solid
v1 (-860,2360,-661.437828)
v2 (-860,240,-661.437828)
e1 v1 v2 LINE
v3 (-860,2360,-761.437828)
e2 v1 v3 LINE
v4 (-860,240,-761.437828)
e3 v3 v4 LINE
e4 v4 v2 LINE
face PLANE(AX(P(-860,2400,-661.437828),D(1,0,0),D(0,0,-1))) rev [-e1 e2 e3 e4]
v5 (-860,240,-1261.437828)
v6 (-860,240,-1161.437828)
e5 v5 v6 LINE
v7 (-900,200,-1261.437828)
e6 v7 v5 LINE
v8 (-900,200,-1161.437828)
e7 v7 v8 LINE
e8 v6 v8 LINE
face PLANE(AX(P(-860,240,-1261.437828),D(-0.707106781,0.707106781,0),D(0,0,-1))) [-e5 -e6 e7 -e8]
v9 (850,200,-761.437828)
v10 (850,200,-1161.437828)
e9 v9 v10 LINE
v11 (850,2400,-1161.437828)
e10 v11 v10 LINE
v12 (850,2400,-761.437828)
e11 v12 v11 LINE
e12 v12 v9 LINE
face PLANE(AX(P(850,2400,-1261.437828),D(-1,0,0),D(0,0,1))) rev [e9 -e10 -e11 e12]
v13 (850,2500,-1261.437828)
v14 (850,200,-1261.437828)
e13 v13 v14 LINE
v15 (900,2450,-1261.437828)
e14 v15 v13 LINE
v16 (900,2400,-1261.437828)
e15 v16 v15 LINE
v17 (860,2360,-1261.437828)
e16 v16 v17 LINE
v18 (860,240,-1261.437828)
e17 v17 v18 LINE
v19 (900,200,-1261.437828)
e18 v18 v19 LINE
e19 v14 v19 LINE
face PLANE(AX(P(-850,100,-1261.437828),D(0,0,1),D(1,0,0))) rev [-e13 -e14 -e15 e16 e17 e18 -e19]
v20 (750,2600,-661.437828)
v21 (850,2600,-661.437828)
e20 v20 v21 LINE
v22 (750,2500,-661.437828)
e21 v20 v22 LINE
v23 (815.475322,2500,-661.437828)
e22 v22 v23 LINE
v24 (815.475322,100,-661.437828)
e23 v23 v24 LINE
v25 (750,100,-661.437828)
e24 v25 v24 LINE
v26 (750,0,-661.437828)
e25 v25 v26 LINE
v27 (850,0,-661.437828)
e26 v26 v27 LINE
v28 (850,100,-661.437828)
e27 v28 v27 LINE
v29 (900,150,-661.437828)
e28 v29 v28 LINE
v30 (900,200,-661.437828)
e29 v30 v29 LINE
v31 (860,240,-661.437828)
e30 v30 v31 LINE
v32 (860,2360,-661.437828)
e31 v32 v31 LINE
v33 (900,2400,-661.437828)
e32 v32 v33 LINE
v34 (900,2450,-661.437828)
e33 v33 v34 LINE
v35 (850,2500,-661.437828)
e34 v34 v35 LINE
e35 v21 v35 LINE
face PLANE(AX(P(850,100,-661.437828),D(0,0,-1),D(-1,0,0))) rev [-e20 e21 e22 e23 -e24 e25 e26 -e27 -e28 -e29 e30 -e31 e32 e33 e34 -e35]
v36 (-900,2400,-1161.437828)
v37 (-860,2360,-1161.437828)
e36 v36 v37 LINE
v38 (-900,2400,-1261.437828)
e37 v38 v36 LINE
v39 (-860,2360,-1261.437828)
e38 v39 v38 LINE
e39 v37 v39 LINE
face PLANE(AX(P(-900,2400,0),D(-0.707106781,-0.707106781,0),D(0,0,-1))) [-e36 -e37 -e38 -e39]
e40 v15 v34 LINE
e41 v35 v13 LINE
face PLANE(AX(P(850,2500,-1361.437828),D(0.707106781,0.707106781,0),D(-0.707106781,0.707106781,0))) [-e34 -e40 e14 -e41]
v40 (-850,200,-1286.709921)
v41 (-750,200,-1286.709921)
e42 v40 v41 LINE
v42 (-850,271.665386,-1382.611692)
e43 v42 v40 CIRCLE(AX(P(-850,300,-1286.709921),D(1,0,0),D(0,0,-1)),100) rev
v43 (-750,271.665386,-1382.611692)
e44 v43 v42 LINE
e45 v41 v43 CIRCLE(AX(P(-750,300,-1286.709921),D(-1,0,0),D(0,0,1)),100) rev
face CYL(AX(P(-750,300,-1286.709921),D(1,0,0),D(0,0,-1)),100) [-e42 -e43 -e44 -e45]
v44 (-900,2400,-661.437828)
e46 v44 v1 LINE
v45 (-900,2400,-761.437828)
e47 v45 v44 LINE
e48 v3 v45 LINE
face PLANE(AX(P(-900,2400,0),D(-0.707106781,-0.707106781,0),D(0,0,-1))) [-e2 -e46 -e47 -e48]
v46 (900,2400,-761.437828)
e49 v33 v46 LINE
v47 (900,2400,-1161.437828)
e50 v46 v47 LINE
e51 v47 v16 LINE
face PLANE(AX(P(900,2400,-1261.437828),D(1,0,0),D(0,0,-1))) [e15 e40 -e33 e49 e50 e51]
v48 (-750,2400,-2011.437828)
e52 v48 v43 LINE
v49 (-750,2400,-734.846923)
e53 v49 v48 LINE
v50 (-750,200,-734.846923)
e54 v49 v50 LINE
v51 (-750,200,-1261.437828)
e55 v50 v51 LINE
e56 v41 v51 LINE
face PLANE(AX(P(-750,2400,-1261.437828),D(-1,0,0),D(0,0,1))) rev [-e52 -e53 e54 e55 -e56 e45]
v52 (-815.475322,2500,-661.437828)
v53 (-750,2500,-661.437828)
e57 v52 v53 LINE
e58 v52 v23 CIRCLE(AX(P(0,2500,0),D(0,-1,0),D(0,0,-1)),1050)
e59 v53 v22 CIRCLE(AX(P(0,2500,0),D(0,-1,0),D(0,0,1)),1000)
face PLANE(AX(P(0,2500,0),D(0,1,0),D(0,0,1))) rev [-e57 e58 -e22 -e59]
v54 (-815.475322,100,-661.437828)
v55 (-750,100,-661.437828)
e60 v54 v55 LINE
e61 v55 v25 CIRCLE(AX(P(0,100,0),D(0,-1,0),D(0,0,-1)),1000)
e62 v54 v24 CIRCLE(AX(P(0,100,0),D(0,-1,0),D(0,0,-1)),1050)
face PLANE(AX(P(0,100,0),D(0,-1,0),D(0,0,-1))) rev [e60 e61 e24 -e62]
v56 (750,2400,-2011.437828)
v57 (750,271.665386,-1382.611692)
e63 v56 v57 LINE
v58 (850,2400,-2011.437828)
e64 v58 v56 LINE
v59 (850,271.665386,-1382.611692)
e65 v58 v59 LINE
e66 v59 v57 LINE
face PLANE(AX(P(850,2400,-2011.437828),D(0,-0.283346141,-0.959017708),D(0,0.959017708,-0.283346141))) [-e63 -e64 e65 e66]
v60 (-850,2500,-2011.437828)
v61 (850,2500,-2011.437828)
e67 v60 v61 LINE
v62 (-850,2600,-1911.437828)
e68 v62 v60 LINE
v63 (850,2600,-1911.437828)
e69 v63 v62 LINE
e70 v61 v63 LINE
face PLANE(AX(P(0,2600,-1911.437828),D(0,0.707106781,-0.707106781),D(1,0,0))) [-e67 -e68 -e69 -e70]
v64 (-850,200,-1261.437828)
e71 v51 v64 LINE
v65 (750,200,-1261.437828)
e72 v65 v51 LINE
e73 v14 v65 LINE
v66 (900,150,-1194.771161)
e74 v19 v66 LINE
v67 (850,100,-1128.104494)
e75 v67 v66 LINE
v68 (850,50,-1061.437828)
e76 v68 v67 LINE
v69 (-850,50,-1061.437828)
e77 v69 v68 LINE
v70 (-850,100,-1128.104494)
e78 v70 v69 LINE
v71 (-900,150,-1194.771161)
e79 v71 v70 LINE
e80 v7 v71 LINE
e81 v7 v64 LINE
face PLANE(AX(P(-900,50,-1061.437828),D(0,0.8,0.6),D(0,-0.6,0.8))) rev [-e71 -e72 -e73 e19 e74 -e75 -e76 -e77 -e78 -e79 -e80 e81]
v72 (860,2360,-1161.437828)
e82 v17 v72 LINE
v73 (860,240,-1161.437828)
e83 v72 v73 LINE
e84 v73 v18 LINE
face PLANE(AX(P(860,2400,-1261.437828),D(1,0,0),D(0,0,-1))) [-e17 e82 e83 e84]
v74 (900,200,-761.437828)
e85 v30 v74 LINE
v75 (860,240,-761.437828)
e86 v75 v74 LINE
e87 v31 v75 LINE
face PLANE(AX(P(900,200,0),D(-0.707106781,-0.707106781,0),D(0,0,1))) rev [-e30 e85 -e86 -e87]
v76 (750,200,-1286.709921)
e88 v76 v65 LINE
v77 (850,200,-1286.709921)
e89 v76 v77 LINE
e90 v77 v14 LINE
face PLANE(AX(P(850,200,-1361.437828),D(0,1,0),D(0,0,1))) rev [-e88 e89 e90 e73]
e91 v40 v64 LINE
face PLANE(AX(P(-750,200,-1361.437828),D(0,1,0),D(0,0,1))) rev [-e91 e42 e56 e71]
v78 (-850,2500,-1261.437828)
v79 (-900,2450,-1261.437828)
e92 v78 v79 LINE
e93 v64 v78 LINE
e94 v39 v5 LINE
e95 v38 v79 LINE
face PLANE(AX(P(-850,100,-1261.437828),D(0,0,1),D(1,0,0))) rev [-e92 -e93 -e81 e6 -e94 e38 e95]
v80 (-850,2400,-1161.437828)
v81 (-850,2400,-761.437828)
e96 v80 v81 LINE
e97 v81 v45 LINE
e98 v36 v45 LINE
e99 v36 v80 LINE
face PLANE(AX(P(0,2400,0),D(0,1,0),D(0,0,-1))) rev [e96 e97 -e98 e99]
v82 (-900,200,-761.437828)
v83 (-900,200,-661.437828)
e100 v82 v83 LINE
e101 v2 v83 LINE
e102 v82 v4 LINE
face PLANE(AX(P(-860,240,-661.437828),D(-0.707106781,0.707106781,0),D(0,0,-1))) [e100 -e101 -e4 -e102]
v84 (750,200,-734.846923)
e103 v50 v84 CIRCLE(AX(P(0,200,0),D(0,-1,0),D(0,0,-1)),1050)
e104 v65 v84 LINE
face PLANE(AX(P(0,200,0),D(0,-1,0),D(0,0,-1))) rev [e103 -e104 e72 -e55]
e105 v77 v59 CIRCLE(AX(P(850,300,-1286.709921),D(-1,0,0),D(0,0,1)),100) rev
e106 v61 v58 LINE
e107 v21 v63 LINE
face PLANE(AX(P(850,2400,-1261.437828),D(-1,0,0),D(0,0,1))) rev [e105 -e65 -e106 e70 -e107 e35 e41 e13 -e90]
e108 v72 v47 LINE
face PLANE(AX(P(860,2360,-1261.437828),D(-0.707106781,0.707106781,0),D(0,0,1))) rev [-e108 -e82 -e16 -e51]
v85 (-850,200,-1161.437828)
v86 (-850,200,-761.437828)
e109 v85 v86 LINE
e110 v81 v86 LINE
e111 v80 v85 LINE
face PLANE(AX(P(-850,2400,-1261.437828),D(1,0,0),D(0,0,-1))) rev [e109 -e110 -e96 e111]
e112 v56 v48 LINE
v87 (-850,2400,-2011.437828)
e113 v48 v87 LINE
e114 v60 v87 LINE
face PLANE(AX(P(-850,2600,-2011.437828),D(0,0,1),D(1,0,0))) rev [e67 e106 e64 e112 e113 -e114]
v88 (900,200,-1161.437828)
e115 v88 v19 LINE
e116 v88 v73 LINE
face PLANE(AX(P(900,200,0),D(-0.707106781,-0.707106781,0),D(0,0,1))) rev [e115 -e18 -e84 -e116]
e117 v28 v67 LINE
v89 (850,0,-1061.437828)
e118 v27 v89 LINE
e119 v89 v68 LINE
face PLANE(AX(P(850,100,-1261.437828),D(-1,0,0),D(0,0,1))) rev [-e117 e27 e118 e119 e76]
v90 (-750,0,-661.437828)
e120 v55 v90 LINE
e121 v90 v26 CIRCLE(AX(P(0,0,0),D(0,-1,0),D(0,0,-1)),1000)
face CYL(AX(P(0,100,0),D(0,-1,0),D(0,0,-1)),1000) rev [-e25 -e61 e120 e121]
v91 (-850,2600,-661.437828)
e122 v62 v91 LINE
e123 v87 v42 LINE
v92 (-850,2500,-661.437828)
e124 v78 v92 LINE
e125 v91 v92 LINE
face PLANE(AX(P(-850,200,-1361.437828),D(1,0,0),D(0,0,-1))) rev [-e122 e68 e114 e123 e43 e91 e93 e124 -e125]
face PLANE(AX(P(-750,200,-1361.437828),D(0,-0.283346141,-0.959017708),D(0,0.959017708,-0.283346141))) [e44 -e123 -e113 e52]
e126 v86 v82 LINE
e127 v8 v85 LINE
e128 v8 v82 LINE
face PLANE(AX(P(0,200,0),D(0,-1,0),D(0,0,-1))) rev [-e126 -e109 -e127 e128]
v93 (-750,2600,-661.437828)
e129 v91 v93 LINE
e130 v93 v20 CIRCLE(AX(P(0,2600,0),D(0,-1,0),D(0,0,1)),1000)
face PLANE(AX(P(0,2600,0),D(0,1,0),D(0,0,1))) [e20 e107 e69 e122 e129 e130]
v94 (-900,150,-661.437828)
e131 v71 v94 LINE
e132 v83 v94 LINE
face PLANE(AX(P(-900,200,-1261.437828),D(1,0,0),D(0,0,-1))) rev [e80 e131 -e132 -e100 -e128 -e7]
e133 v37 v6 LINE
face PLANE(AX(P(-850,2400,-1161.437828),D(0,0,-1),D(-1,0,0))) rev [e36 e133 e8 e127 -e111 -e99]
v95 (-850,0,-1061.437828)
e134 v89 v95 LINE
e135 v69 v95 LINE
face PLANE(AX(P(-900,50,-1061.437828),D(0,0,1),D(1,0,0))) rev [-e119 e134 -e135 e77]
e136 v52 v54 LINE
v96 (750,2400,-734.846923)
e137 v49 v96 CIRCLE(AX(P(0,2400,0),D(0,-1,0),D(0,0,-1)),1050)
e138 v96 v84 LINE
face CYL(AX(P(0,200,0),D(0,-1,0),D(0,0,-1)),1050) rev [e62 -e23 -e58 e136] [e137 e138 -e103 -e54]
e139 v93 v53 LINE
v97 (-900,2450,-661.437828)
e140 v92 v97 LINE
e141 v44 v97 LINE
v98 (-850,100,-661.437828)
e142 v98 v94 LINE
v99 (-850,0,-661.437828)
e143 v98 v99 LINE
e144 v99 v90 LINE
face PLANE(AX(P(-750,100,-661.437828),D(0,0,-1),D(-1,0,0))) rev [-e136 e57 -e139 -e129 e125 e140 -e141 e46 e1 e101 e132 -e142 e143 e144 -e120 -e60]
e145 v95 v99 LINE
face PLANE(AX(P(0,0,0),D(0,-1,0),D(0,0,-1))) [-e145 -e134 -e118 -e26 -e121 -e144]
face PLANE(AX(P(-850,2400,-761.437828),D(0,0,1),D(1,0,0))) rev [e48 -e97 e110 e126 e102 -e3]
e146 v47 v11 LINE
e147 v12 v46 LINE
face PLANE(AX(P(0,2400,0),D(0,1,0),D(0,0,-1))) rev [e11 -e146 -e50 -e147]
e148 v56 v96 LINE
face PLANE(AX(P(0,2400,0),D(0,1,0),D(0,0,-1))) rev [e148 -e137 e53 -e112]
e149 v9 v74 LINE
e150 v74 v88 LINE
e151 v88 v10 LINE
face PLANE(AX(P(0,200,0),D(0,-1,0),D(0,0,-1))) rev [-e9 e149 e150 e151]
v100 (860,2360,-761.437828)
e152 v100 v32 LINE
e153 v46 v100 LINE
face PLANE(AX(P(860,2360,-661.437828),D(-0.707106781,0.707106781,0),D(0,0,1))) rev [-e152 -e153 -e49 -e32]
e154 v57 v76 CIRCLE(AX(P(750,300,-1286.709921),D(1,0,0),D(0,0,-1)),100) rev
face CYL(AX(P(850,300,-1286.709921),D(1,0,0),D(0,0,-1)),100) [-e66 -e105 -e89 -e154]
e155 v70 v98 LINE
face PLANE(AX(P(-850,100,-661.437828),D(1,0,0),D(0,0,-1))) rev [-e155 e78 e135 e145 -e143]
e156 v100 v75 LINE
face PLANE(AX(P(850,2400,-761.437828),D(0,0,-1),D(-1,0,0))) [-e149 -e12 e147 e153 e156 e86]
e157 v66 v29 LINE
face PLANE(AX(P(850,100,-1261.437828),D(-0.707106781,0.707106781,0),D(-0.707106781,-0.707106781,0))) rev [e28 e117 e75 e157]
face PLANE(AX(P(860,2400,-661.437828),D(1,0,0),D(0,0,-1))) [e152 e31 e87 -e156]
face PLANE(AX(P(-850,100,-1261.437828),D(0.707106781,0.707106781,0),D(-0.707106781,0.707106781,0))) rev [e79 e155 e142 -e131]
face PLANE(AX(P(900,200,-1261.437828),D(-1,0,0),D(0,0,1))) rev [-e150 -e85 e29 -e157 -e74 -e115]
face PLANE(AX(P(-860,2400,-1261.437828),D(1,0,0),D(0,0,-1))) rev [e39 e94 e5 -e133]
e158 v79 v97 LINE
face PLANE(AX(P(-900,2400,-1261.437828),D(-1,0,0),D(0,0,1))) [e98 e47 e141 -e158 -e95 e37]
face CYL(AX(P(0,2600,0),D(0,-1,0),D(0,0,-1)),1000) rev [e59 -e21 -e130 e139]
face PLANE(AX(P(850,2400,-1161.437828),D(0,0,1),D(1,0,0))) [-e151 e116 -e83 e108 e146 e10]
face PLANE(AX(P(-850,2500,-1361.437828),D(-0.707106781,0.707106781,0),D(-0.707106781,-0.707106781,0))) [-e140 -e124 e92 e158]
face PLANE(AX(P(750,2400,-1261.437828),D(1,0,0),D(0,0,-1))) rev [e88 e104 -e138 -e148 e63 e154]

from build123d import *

# Parameters (mm, degrees)
BOSS_EXTRUDE1_DEPTH  = 100
BOSS_EXTRUDE2_DEPTH  = 100
CUT_EXTRUDE1_DEPTH   = 1101
BOSS_EXTRUDE3_DEPTH  = 2200
SKETCH6_W            = 10
SKETCH6_H            = 100
BOSS_EXTRUDE4_DEPTH  = 2200
SKETCH7_W            = 100
SKETCH7_H            = 2200
BOSS_EXTRUDE6_DEPTH  = 100
CHAMFER2_SIZE        = 40
MIRROR2_START        = -1261.437827766
MIRROR2_DEPTH        = 211.43967231
MIRROR2_START_2      = -1049.998155456
MIRROR2_2_DEPTH      = 388.56032769
MIRROR2_START_3      = 2400
MIRROR2_3_DEPTH      = 100
CHAMFER3_SIZE        = 40
BOSS_EXTRUDE7_DEPTH  = 100
BOSS_EXTRUDE8_DEPTH  = 100
FILLET2_R            = 100
BOSS_EXTRUDE9_DEPTH  = 100
SKETCH13_W           = 1700
SKETCH13_H           = 750
BOSS_EXTRUDE12_DEPTH = 200
CHAMFER5_SIZE        = 100
CUT_EXTRUDE2_DEPTH   = 3748.78362969


with BuildPart() as part:
    # Sketch1 → Boss-Extrude1 (new body)
    with BuildSketch(Plane(origin=(0, 0, 0), x_dir=(1, 0, 0), z_dir=(0, 1, 0))):
        with BuildLine():
            Line((-750, 661.437827766), (-850, 661.437827766))
            Line((-850, 661.437827766), (-850, 1261.437827766))
            Line((-850, 1261.437827766), (850, 1261.437827766))
            Line((850, 1261.437827766), (850, 661.437827766))
            Line((850, 661.437827766), (750, 661.437827766))
            ThreePointArc((750, 661.437827766), (0, 1000), (-750, 661.437827766))
        make_face()
    extrude(amount=BOSS_EXTRUDE1_DEPTH)

    # Sketch2 → Boss-Extrude2 (add)
    with BuildSketch(Plane(origin=(0, 100, 0), x_dir=(1, 0, 0), z_dir=(0, 1, 0))):
        with BuildLine():
            Line((850, 1261.437827766), (900, 1261.437827766))
            Line((900, 1261.437827766), (900, 661.437827766))
            Line((900, 661.437827766), (815.475321515, 661.437827766))
            ThreePointArc((815.475321515, 661.437827766), (0, 1050), (-815.475321515, 661.437827766))
            Line((-815.475321515, 661.437827766), (-850, 661.437827766))
            Line((-850, 661.437827766), (-900, 661.437827766))
            Line((-900, 661.437827766), (-900, 1261.437827766))
            Line((-900, 1261.437827766), (-850, 1261.437827766))
            Line((-850, 1261.437827766), (850, 1261.437827766))
        make_face()
    extrude(amount=BOSS_EXTRUDE2_DEPTH)

    # Sketch4 → Cut-Extrude1 (cut, through all)
    with BuildSketch(Plane.XY.offset(-661.437827766)):
        Polygon((-850, 100), (-900, 150), (-900, 100), align=None)
        Polygon((850, 100), (900, 150), (900, 100), align=None)
    extrude(amount=-CUT_EXTRUDE1_DEPTH, mode=Mode.SUBTRACT)

    # Sketch5 → Boss-Extrude3 (add)
    with BuildSketch(Plane(origin=(0, 200, 0), x_dir=(1, 0, 0), z_dir=(0, 1, 0))):
        with BuildLine():
            Line((-750, 1261.437827766), (-750, 734.846922835))
            ThreePointArc((-750, 734.846922835), (-783.597772698, 698.90952964), (-815.475321515, 661.437827766))
            Line((-815.475321515, 661.437827766), (-850, 661.437827766))
            Line((-850, 661.437827766), (-850, 1261.437827766))
            Line((-850, 1261.437827766), (-750, 1261.437827766))
        make_face()
        with BuildLine():
            Line((850, 661.437827766), (815.475321515, 661.437827766))
            ThreePointArc((815.475321515, 661.437827766), (783.597772698, 698.90952964), (750, 734.846922835))
            Line((750, 734.846922835), (750, 1261.437827766))
            Line((750, 1261.437827766), (850, 1261.437827766))
            Line((850, 1261.437827766), (850, 661.437827766))
        make_face()
    extrude(amount=BOSS_EXTRUDE3_DEPTH)

    # Sketch6 → Boss-Extrude4 (add)
    with BuildSketch(Plane(origin=(0, 200, 0), x_dir=(1, 0, 0), z_dir=(0, 1, 0))):
        with Locations((-855, 1211.437827766)):
            Rectangle(SKETCH6_W, SKETCH6_H)
        with Locations((-855, 711.437827766)):
            Rectangle(SKETCH6_W, SKETCH6_H)
    boss_extrude4 = extrude(amount=BOSS_EXTRUDE4_DEPTH)

    # Sketch7 → Boss-Extrude6 (add)
    with BuildSketch(Plane(origin=(0, 0, -1261.437827766), x_dir=(-1, 0, 0), z_dir=(0, 0, -1))):
        with Locations((-800, 1300)):
            Rectangle(SKETCH7_W, SKETCH7_H)
        with Locations((800, 1300)):
            Rectangle(SKETCH7_W, SKETCH7_H)
    extrude(amount=BOSS_EXTRUDE6_DEPTH)

    # Mirror1: Boss-Extrude4 across plane
    add(boss_extrude4.mirror(Plane(origin=(0, 0, 0), x_dir=(0, 0, 1), z_dir=(1, 0, 0))))

    # Chamfer2
    chamfer2_edges = [part.edges().sort_by_distance(p)[0] for p in [
        (-860, 200, -1211.437827766),
        (-860, 200, -711.437827766),
        (860, 200, -1211.437827766),
        (860, 200, -711.437827766),
    ]]
    chamfer(chamfer2_edges, length=CHAMFER2_SIZE - 0.0001)  # a hair under: the kernel refuses the full size

    # Mirror2: read off the stored shape, not the designer's step
    # Mirror2 outline → Mirror2 (add)
    with BuildSketch(Plane.XY.offset(MIRROR2_START)):
        Polygon((-850, 2500), (-900, 2450), (-900, 2400), (900, 2400), (900, 2450), (850, 2500), align=None)
    extrude(amount=MIRROR2_DEPTH)

    # Mirror2 2 outline → Mirror2 2 (add)
    with BuildSketch(Plane.XY.offset(MIRROR2_START_2)):
        Polygon((-850, 2500), (-900, 2450), (-900, 2400), (900, 2400), (900, 2450), (850, 2500), align=None)
    extrude(amount=MIRROR2_2_DEPTH)

    # Mirror2 3 outline → Mirror2 3 (cut)
    with BuildSketch(Plane(origin=(0, 0, 0), x_dir=(1, 0, 0), z_dir=(0, 1, 0)).offset(MIRROR2_START_3)):
        with BuildLine():
            ThreePointArc((815.475321515, 661.437827766), (0, 1050), (-815.475321515, 661.437827766))
            Line((-815.475321515, 661.437827766), (815.475321515, 661.437827766))
        make_face()
    extrude(amount=MIRROR2_3_DEPTH, mode=Mode.SUBTRACT)

    # Chamfer3
    chamfer3_edges = [part.edges().sort_by_distance(p)[0] for p in [
        (860, 2400, -1211.437827766),
        (860, 2400, -711.437827766),
        (-860, 2400, -711.437827766),
        (-860, 2400, -1211.437827766),
    ]]
    chamfer(chamfer3_edges, length=CHAMFER3_SIZE - 0.0001)  # a hair under: the kernel refuses the full size

    # Sketch9 → Boss-Extrude7 (add)
    with BuildSketch(Plane.ZY.offset(850)):
        Polygon((-1361.437827766, 200), (-2011.437827766, 2400), (-1361.437827766, 2400), align=None)
    extrude(amount=-BOSS_EXTRUDE7_DEPTH)

    # Sketch10 → Boss-Extrude8 (add)
    with BuildSketch(Plane.ZY.offset(-750)):
        Polygon((-2011.437827766, 2400), (-1361.437827766, 200), (-1361.437827766, 2400), align=None)
    extrude(amount=-BOSS_EXTRUDE8_DEPTH)

    # Fillet2
    fillet2_edges = [part.edges().sort_by_distance(p)[0] for p in [
        (-800, 200, -1361.437827766),
        (800, 200, -1361.437827766),
    ]]
    fillet(fillet2_edges, radius=FILLET2_R)

    # Sketch11 → Boss-Extrude9 (add)
    with BuildSketch(Plane(origin=(0, 2500, 0), x_dir=(1, 0, 0), z_dir=(0, 1, 0))):
        with BuildLine():
            Line((-850, 661.437827766), (-750, 661.437827766))
            ThreePointArc((-750, 661.437827766), (0, 1000), (750, 661.437827766))
            Line((750, 661.437827766), (850, 661.437827766))
            Line((850, 661.437827766), (850, 1261.437827766))
            Line((850, 1261.437827766), (-850, 1261.437827766))
            Line((-850, 1261.437827766), (-850, 661.437827766))
        make_face()
    extrude(amount=BOSS_EXTRUDE9_DEPTH)

    # Sketch13 → Boss-Extrude12 (add)
    with BuildSketch(Plane(origin=(0, 2400, 0), x_dir=(1, 0, 0), z_dir=(0, 1, 0))):
        with Locations((0, 1636.437827766)):
            Rectangle(SKETCH13_W, SKETCH13_H)
    extrude(amount=BOSS_EXTRUDE12_DEPTH)

    # Chamfer5
    chamfer5_edges = [part.edges().sort_by_distance(p)[0] for p in [
        (0, 2600, -2011.437827766),
    ]]
    chamfer(chamfer5_edges, length=CHAMFER5_SIZE)

    # Sketch14 → Cut-Extrude2 (cut, through all)
    with BuildSketch(Plane(origin=(900, 0, 0), x_dir=(0, 0, -1), z_dir=(1, 0, 0))):
        Polygon((1061.437827766, 50), (1261.437827766, 200), (1261.437827766, 50), (1261.437827766, 0), (1061.437827766, 0), align=None)
    extrude(amount=-CUT_EXTRUDE2_DEPTH, mode=Mode.SUBTRACT)


solid = part.part
